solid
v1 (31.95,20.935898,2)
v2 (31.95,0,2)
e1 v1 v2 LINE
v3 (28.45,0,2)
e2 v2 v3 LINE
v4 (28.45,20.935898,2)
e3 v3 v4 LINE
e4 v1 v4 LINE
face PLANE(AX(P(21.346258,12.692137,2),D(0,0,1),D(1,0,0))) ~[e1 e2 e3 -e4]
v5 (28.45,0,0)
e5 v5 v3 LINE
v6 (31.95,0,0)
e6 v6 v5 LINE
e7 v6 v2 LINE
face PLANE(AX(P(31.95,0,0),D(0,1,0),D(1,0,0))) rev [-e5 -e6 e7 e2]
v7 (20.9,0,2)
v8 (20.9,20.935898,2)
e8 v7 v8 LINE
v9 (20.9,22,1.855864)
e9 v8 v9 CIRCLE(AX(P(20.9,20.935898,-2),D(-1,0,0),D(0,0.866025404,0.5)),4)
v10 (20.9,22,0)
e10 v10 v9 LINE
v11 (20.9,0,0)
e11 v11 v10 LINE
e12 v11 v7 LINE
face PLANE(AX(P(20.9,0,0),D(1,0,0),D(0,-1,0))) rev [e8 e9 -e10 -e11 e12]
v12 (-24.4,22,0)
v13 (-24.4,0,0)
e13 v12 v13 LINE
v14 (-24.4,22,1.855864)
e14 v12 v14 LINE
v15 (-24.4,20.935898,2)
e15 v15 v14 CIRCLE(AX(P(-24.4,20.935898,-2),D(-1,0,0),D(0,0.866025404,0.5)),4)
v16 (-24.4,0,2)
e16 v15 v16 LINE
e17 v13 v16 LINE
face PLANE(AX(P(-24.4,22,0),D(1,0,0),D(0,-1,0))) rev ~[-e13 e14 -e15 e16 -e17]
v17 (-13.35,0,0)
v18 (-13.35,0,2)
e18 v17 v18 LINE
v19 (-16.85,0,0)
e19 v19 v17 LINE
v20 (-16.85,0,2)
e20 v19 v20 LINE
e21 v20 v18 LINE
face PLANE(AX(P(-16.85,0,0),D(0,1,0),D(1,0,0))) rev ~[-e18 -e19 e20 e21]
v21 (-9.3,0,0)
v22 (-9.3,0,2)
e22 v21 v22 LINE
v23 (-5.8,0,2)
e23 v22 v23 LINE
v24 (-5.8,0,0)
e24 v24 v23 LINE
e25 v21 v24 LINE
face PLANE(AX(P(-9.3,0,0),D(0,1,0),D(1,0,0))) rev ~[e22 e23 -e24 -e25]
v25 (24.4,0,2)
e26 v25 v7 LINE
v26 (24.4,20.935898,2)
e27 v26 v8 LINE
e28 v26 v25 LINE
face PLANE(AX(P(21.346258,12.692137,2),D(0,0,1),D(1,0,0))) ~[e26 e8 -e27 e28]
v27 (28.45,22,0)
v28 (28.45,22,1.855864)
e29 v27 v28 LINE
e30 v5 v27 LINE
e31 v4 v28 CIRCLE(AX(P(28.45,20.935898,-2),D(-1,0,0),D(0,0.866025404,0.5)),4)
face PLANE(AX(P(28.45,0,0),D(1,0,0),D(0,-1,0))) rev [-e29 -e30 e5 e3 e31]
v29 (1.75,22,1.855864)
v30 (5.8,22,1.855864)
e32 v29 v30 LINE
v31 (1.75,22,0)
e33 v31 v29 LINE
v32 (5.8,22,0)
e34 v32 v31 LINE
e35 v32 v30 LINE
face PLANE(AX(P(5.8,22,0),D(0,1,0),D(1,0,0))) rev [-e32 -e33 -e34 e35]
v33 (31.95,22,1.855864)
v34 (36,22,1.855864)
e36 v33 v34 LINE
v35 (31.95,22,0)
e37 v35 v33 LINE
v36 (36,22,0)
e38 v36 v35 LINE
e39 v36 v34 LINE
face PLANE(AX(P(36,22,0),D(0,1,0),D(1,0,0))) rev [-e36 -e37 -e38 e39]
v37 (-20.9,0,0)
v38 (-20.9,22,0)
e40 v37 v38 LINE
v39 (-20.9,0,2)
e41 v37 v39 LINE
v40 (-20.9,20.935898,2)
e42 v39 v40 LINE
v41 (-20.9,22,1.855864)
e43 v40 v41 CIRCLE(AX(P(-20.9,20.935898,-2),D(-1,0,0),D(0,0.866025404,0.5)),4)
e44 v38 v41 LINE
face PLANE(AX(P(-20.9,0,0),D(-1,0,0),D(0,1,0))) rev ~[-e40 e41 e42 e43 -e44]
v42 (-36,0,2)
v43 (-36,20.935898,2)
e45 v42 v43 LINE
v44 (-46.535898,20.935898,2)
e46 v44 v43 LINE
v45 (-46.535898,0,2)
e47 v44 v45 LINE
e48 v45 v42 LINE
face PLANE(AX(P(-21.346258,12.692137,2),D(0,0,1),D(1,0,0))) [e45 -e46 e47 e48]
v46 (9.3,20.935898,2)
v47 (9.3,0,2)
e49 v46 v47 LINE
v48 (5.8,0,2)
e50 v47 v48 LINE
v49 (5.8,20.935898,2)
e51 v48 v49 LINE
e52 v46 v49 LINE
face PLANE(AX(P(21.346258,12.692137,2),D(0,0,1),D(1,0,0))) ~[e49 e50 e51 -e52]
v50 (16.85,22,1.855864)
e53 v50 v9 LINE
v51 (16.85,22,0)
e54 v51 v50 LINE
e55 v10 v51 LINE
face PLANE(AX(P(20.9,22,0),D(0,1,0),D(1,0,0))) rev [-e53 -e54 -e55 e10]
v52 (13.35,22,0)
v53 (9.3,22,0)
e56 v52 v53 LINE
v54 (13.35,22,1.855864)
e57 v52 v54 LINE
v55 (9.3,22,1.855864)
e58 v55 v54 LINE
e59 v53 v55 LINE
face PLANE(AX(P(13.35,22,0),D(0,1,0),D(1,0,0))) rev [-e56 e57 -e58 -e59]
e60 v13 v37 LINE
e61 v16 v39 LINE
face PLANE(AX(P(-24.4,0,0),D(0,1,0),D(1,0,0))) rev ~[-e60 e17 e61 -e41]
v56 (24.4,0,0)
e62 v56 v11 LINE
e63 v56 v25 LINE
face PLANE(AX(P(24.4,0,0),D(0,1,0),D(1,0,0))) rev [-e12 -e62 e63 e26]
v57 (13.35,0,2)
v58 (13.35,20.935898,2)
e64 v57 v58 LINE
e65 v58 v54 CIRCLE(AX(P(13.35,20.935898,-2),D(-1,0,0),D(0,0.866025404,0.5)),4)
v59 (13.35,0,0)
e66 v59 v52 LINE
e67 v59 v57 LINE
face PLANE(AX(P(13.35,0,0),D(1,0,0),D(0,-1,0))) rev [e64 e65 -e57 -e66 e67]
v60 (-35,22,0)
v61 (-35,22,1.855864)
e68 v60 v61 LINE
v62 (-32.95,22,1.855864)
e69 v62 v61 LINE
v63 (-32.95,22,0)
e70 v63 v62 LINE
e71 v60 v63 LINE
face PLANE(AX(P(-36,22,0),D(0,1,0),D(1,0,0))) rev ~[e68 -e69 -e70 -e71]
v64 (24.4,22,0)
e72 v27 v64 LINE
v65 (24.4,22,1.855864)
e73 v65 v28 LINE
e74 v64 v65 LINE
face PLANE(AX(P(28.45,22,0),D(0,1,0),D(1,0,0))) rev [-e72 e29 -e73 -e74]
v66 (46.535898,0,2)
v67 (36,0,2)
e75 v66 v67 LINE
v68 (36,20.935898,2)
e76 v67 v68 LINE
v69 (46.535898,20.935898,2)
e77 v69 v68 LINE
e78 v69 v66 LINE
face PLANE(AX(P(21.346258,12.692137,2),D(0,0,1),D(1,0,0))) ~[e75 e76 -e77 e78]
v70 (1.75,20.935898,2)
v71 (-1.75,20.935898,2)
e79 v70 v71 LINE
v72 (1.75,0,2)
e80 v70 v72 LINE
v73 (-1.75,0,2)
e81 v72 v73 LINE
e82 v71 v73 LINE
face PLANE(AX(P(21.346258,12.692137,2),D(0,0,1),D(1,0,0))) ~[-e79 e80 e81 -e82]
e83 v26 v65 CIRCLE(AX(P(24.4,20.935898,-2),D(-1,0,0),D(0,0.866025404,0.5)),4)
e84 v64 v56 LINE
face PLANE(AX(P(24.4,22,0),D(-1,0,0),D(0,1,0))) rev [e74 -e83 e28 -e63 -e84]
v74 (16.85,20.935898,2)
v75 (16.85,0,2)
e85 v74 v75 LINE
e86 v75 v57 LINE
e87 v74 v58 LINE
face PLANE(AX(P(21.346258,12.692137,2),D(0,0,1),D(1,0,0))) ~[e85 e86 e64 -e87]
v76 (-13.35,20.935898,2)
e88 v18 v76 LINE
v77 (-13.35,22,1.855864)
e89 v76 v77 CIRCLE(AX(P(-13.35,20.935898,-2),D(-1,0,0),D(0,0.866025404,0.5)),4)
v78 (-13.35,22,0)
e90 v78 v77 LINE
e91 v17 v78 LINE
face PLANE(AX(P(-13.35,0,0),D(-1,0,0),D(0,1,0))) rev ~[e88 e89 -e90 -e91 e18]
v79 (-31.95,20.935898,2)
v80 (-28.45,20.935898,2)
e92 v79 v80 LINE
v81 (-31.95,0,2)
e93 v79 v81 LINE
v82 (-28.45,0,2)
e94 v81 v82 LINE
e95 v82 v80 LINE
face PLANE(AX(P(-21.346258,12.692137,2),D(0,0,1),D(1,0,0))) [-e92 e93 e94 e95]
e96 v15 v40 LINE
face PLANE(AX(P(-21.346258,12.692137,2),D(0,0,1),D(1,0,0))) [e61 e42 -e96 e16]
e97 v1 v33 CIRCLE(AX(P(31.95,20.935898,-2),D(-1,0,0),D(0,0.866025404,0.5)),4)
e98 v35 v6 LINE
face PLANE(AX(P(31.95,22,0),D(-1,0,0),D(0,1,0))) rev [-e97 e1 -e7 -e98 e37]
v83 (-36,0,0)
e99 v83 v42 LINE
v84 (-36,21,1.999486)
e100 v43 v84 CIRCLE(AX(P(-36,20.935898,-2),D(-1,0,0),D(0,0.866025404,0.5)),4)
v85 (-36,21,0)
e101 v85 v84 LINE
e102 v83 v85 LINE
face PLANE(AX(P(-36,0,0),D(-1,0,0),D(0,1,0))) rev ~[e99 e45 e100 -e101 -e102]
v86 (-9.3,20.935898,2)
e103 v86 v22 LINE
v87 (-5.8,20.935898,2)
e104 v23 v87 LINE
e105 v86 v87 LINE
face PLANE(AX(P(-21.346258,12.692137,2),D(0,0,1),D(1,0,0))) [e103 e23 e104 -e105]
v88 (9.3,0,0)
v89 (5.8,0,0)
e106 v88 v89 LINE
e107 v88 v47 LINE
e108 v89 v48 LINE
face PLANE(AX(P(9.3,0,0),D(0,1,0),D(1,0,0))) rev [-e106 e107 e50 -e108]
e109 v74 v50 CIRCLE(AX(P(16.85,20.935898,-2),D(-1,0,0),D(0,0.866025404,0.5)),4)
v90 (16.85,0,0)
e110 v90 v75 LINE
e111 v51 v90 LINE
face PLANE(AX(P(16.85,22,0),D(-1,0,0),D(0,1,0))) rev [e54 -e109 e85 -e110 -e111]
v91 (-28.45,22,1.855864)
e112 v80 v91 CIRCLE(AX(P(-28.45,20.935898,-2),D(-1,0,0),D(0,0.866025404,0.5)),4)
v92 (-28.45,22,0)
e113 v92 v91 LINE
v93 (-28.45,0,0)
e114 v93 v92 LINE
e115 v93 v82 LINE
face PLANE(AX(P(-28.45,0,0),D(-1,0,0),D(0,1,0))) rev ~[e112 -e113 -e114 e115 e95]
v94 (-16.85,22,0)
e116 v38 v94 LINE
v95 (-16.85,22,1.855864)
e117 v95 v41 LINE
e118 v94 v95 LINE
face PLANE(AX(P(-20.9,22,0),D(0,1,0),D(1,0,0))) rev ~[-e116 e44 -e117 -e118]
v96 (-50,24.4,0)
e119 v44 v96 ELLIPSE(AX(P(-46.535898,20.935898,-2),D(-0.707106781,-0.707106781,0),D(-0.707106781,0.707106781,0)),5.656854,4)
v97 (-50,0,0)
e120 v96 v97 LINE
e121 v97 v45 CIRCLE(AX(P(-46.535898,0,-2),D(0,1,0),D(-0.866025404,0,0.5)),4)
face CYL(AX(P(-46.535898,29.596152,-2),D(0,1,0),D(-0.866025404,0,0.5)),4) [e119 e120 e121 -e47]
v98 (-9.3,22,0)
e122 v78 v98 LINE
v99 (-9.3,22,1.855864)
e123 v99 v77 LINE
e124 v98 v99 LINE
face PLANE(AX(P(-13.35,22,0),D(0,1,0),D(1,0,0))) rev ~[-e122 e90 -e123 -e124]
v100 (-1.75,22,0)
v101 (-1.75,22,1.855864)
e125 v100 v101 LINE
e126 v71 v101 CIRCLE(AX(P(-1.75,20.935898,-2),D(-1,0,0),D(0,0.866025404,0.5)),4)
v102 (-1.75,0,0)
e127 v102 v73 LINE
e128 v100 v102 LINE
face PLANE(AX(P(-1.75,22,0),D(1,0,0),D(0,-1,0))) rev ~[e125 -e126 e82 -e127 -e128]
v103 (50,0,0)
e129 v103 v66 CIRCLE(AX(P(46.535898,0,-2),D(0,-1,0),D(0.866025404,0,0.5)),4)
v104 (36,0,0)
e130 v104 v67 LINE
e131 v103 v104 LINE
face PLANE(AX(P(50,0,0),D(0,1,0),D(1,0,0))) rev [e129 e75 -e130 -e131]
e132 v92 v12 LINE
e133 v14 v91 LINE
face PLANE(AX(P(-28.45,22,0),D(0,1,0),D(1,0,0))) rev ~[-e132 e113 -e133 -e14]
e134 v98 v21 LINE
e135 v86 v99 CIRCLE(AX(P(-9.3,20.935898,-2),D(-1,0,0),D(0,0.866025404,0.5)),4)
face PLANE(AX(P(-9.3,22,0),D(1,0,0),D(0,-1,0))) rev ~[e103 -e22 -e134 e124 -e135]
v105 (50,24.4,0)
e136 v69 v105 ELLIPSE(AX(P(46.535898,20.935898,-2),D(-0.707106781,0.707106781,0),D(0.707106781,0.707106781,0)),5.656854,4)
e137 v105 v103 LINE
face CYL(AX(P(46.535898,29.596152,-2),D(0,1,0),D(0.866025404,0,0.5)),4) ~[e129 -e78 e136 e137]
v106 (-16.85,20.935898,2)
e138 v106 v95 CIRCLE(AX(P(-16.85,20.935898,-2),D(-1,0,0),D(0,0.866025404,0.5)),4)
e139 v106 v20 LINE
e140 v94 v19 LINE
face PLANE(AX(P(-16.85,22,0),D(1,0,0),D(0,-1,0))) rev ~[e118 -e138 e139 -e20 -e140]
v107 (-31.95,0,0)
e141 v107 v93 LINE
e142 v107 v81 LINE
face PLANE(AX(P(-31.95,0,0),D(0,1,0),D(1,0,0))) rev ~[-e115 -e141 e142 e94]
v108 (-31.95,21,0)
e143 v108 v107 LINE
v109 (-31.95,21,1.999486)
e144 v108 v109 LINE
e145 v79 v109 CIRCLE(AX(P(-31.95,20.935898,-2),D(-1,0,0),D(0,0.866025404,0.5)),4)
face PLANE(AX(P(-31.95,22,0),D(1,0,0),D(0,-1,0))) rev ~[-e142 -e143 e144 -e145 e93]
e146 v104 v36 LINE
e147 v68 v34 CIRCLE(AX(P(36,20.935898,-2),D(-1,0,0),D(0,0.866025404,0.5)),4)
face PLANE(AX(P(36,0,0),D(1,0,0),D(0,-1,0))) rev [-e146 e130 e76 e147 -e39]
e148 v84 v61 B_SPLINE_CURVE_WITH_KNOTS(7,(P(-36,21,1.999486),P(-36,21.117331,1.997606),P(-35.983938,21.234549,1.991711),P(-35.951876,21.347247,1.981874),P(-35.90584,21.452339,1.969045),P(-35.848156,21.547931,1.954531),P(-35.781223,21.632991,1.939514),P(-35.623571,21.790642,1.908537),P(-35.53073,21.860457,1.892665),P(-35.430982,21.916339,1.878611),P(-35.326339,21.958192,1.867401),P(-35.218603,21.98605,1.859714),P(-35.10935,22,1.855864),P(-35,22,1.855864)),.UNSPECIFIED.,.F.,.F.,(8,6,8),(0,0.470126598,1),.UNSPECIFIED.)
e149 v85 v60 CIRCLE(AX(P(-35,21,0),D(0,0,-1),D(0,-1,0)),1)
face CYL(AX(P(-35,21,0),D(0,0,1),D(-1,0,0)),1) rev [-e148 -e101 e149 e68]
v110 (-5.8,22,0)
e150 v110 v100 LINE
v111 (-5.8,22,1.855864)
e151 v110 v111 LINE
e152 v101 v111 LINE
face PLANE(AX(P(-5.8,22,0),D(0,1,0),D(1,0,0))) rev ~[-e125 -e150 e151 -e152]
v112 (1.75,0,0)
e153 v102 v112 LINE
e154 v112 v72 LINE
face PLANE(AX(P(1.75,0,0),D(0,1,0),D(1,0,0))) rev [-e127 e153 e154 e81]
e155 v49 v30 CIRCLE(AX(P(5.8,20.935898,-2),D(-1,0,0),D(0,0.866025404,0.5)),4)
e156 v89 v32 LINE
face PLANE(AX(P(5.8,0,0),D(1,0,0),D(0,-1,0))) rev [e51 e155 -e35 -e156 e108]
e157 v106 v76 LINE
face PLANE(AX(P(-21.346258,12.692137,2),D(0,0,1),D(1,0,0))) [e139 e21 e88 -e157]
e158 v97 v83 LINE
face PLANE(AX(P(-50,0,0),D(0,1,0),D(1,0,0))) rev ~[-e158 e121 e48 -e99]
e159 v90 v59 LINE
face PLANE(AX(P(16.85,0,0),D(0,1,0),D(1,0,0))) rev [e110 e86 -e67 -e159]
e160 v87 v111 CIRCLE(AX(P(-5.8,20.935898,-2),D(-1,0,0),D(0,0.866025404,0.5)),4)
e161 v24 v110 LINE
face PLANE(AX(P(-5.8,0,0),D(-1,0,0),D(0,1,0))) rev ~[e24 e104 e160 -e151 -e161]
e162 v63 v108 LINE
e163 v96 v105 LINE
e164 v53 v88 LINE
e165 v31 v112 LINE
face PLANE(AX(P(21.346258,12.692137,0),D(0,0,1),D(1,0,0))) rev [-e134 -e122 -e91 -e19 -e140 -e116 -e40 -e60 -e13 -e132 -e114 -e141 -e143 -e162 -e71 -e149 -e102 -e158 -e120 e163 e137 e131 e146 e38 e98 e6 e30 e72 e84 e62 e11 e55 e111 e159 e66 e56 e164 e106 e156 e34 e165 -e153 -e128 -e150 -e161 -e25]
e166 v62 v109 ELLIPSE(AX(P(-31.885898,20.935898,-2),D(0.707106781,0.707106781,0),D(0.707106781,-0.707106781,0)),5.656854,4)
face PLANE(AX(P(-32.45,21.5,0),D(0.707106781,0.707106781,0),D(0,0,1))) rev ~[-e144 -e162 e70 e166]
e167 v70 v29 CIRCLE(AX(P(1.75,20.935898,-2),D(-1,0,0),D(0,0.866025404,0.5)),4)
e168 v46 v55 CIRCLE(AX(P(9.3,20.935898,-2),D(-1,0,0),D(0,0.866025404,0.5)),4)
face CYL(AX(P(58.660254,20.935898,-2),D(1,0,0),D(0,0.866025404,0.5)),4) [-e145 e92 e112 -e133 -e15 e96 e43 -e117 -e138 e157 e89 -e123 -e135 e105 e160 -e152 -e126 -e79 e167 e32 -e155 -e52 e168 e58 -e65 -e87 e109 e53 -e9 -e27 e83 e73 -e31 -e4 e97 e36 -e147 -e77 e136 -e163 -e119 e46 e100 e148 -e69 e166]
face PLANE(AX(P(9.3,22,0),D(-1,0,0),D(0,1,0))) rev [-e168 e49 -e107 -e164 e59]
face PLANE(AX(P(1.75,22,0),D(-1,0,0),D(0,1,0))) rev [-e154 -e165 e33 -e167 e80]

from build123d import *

# Parameters (mm, degrees)
F1_DEPTH    = 2
F2_T1_DEPTH = 67.3205080757
F3_T1_DEPTH = 38.2564064606
F5_R        = 1
F6_SIZE     = 1


# Not quite as in the source:
# - a fillet or chamfer that OpenCascade refuses, or shapes differently, is made with other operations: its cross-section is extruded or revolved along the edge and cut away or added


with BuildPart() as f1:
    # F0 (on Top) → F1 (new body)
    with BuildSketch(Plane.XY):
        Polygon((-1.75, 0), (0, 0), (0, 24.4), (-50, 24.4), (-50, 0), (-36, 0), (-36, 22), (-31.95, 22), (-31.95, 0), (-28.45, 0), (-28.45, 22), (-24.4, 22), (-24.4, 0), (-20.9, 0), (-20.9, 22), (-16.85, 22), (-16.85, 0), (-13.35, 0), (-13.35, 22), (-9.3, 22), (-9.3, 0), (-5.8, 0), (-5.8, 22), (-1.75, 22), align=None)
    extrude(amount=F1_DEPTH)

    # F2: fillet of radius 4 on 1 edges, made by hand

    # F2_s2 → F2_t1 (cut)
    with BuildSketch(Plane.YZ.offset(-58.6602540378)):
        with BuildLine():
            ThreePointArc((24.4, 0), (22.9358983849, 1.4641016151), (20.9358983849, 2))
            Line((20.9358983849, 2), (24.4, 2))
            Line((24.4, 2), (24.4, 0))
        make_face()
    extrude(amount=F2_T1_DEPTH, mode=Mode.SUBTRACT)

    # F3: fillet of radius 4 on 1 edges, made by hand

    # F3_s2 → F3_t1 (cut)
    with BuildSketch(Plane.XZ.offset(-29.5961524227)):
        with BuildLine():
            ThreePointArc((-50, 0), (-48.5358983849, 1.4641016151), (-46.5358983849, 2))
            Line((-46.5358983849, 2), (-50, 2))
            Line((-50, 2), (-50, 0))
        make_face()
    extrude(amount=F3_T1_DEPTH, mode=Mode.SUBTRACT)

    # F4: F1 across plane


with BuildPart() as f1_1:
    add(f1.part)
    add(f1.part.mirror(Plane.YZ))

    # F5
    f5_edges = [f1_1.edges().sort_by_distance(p)[0] for p in [
        (-36, 22, 0.927932),
    ]]
    fillet(f5_edges, radius=F5_R)

    # F6
    f6_edges = [f1_1.edges().sort_by_distance(p)[0] for p in [
        (-31.95, 22, 0.927932),
    ]]
    chamfer(f6_edges, length=F6_SIZE)


solid = f1_1.part
